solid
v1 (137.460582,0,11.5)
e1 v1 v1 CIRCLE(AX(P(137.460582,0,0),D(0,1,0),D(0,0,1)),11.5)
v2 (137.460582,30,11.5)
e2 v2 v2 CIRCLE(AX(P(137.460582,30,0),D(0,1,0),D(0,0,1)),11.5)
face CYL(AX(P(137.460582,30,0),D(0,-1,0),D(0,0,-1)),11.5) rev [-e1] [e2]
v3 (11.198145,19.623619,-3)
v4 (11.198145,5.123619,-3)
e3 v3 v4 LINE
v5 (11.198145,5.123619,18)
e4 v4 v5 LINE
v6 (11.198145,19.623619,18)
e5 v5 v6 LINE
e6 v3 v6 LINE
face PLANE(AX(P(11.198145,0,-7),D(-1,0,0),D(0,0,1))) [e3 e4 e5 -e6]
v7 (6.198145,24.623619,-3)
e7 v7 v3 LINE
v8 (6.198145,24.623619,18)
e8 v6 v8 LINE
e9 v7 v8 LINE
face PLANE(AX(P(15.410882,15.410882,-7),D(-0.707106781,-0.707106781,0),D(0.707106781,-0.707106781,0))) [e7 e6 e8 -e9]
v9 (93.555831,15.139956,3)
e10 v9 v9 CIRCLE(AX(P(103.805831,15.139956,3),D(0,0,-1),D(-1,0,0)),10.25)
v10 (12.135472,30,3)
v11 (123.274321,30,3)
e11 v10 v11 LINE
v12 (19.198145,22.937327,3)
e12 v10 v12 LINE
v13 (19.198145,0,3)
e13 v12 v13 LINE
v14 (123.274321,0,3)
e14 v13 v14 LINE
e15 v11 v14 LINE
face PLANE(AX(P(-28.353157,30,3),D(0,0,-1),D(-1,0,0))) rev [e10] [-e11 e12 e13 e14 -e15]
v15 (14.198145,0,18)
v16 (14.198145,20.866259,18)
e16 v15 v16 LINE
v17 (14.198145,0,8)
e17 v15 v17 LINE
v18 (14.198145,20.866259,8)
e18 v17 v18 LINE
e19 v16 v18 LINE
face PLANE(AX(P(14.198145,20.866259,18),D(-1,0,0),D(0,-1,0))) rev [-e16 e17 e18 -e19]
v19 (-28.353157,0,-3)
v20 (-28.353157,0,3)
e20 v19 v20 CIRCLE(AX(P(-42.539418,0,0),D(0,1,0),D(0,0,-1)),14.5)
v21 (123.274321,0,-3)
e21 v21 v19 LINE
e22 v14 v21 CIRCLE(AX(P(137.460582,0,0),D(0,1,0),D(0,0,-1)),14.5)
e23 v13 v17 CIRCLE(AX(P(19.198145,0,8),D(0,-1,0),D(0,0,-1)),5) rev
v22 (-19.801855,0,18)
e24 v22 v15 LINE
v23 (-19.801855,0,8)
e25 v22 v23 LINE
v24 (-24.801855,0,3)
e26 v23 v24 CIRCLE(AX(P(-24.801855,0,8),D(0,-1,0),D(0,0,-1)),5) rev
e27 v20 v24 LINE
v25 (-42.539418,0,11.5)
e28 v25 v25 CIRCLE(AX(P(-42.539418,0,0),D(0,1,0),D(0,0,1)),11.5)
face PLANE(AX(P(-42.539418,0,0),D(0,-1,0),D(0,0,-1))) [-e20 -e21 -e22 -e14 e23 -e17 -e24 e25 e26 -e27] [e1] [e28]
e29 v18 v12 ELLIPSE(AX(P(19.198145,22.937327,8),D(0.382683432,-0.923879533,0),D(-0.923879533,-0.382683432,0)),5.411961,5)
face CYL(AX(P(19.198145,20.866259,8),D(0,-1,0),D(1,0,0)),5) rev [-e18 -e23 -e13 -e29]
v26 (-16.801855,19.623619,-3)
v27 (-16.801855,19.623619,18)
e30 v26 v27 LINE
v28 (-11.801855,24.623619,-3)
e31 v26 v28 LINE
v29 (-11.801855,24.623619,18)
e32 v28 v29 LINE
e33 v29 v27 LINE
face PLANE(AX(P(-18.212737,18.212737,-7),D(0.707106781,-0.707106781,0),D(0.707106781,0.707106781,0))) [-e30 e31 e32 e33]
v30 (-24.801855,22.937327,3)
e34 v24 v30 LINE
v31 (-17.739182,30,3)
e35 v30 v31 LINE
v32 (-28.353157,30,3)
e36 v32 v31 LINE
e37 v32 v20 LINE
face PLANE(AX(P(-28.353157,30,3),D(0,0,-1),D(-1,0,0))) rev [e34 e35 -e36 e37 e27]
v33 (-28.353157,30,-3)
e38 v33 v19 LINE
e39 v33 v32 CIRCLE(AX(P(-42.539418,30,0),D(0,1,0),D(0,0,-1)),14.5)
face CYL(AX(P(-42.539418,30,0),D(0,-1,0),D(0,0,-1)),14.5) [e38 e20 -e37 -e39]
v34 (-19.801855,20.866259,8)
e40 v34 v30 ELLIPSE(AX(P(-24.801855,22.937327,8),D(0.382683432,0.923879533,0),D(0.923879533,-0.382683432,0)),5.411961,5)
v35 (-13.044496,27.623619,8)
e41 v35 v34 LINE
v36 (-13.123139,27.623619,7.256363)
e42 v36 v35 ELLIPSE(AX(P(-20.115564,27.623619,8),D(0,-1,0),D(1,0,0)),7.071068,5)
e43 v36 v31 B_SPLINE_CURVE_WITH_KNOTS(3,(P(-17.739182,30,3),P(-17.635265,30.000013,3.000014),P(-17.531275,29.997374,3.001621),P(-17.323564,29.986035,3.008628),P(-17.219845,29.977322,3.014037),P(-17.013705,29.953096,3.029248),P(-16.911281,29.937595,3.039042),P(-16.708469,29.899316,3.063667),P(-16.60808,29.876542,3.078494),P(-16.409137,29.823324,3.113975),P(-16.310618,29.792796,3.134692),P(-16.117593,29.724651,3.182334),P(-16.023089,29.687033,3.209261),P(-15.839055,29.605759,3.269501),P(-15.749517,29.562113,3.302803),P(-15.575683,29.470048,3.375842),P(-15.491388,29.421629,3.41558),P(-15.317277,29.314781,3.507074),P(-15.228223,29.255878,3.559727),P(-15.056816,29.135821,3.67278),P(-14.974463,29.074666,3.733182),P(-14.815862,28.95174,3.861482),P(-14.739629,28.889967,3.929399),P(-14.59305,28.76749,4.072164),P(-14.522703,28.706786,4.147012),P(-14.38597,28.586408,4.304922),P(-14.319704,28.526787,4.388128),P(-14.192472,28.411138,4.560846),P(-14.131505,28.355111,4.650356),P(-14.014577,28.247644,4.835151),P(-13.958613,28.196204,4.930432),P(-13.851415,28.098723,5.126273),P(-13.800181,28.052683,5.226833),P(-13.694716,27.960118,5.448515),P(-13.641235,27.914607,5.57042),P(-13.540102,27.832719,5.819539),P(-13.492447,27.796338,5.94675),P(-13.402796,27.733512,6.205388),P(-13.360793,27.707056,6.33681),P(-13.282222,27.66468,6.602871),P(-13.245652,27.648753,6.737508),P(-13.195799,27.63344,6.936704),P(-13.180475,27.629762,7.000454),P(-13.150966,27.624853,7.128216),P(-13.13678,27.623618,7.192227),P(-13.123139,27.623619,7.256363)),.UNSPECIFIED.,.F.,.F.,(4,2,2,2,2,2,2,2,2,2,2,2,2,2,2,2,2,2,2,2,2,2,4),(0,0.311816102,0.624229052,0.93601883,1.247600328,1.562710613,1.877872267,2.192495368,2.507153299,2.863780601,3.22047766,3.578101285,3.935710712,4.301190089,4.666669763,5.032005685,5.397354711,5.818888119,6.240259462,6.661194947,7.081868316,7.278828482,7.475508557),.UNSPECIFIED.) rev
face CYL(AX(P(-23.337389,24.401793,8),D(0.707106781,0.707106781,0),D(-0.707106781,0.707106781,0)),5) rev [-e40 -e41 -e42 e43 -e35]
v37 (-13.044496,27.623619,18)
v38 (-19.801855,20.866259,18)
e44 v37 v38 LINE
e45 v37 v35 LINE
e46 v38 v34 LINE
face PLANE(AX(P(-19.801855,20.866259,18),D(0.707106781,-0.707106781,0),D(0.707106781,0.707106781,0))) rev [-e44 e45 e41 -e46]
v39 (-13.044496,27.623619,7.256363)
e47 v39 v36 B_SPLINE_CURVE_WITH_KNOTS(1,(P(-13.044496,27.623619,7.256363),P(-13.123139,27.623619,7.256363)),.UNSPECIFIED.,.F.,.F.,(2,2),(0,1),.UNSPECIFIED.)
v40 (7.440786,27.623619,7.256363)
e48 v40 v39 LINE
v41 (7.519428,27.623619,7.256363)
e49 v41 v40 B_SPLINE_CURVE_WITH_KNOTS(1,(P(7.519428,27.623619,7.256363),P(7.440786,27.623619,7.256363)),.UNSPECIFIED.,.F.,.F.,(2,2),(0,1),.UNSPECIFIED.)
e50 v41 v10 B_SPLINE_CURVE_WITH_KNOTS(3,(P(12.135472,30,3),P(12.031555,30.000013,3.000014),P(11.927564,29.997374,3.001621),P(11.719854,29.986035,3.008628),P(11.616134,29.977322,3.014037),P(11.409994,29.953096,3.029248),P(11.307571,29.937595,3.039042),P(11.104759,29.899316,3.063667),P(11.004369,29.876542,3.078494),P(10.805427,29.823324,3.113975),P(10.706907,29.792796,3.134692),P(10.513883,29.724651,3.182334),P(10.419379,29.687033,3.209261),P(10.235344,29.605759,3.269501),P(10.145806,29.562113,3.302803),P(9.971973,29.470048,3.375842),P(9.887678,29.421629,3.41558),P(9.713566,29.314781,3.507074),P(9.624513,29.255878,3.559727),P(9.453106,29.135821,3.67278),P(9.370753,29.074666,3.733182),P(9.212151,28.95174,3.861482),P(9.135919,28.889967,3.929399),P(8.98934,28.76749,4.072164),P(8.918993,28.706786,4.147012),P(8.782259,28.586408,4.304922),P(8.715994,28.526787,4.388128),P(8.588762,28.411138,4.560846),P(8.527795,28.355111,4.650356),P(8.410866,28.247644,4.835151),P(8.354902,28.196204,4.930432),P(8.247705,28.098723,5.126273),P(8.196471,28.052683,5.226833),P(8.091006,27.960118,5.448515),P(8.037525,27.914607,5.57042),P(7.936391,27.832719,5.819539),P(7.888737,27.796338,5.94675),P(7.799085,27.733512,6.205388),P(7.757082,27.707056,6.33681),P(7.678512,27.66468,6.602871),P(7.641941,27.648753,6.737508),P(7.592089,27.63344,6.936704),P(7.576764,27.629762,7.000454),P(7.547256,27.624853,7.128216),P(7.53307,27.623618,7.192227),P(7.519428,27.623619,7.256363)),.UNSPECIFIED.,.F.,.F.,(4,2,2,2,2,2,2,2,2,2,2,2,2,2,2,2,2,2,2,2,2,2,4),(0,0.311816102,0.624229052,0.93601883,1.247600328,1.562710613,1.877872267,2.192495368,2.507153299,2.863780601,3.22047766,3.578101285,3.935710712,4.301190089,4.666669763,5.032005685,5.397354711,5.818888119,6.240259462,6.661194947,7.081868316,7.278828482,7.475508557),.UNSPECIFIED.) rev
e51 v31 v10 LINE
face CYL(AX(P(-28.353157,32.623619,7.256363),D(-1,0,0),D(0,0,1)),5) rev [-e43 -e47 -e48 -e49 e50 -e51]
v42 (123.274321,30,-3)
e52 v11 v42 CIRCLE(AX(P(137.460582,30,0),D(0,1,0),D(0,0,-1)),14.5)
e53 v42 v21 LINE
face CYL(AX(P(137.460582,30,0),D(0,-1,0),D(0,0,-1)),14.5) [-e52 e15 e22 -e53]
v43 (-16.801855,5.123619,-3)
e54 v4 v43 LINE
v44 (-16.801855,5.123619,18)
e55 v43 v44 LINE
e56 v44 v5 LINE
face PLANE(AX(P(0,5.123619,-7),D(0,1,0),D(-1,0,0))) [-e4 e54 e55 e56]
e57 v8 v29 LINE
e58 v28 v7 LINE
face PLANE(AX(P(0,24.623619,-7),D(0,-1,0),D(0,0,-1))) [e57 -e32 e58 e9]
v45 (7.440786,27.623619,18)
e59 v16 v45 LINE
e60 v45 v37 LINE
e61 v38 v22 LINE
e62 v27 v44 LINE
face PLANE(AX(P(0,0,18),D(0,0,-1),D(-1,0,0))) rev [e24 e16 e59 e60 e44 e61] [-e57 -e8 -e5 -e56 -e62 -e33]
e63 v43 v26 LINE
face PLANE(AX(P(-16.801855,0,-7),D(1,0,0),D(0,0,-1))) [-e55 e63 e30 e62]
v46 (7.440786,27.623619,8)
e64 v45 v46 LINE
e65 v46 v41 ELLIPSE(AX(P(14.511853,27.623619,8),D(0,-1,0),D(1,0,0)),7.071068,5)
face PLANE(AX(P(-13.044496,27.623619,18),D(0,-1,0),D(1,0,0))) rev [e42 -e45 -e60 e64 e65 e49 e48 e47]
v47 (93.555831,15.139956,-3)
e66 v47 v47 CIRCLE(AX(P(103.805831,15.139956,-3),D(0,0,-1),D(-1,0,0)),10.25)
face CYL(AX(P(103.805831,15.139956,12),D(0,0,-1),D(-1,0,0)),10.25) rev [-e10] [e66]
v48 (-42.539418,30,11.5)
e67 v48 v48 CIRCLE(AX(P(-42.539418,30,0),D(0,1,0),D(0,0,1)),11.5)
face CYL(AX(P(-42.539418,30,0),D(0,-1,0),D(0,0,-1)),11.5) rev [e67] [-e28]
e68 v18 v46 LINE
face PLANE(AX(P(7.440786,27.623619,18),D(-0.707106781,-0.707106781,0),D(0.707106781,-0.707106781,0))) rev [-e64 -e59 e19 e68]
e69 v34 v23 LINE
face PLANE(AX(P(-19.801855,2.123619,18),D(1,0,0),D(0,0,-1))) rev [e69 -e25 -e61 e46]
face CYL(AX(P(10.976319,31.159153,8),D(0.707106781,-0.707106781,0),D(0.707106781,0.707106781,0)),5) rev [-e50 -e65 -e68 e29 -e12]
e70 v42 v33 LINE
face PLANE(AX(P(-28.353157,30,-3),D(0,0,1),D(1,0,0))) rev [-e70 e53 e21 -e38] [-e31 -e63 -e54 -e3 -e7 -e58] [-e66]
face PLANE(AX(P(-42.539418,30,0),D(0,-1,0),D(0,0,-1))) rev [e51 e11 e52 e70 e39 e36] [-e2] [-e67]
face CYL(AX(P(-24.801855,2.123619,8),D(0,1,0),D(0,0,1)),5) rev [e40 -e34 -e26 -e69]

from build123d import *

# Parameters (mm, degrees)
SKETCH1_R           = 11.5
BOSS_EXTRUDE1_DEPTH = 30
CUT_EXTRUDE1_DEPTH  = 10
BOSS_EXTRUDE2_DEPTH = 15
SKETCH4_W           = 34
SKETCH4_H           = 2.123618691
BOSS_EXTRUDE3_DEPTH = 15
FILLET1_R           = 5
SKETCH5_R           = 10.25
CUT_EXTRUDE2_DEPTH  = 15


with BuildPart() as part:
    # Sketch1 → Boss-Extrude1 (new body)
    with BuildSketch(Plane(origin=(0, 0, 0), x_dir=(1, 0, 0), z_dir=(0, 1, 0))):
        with BuildLine():
            Line((-28.353157483, 3), (123.274320599, 3))
            ThreePointArc((123.274320599, 3), (151.960581558, 0), (123.274320599, -3))
            Line((123.274320599, -3), (-28.353157483, -3))
            ThreePointArc((-28.353157483, -3), (-57.039418442, 0), (-28.353157483, 3))
        make_face()
        with Locations(Location((-42.539418442, 0, 0), (0, 0, 270))):
            Circle(SKETCH1_R, mode=Mode.SUBTRACT)
        with Locations(Location((137.460581558, 0, 0), (0, 0, 270))):
            Circle(SKETCH1_R, mode=Mode.SUBTRACT)
    extrude(amount=BOSS_EXTRUDE1_DEPTH)

    # Sketch2 → Cut-Extrude1 (cut)
    with BuildSketch(Plane.XY.offset(3)):
        Polygon((6.198144817, 24.623618691), (-11.801855183, 24.623618691), (-16.801855183, 19.623618691), (-16.801855183, 5.123618691), (11.198144817, 5.123618691), (11.198144817, 19.623618691), align=None)
    extrude(amount=-CUT_EXTRUDE1_DEPTH, mode=Mode.SUBTRACT)

    # Sketch3 → Boss-Extrude2 (add)
    with BuildSketch(Plane.XY.offset(3)):
        Polygon((-13.044495871, 27.623618691), (7.440785504, 27.623618691), (14.198144817, 20.866259379), (14.198144817, 2.123618691), (-19.801855183, 2.123618691), (-19.801855183, 20.866259379), align=None)
        Polygon((-11.801855183, 24.623618691), (-16.801855183, 19.623618691), (-16.801855183, 5.123618691), (11.198144817, 5.123618691), (11.198144817, 19.623618691), (6.198144817, 24.623618691), align=None, mode=Mode.SUBTRACT)
    extrude(amount=BOSS_EXTRUDE2_DEPTH)

    # Sketch4 → Boss-Extrude3 (add)
    with BuildSketch(Plane.XY.offset(3)):
        with Locations((-2.801855183, 1.061809346)):
            Rectangle(SKETCH4_W, SKETCH4_H)
    extrude(amount=BOSS_EXTRUDE3_DEPTH)

    # Fillet1
    # the kernel refuses this fillet: 5 mm, written as the material it adds along each edge
    with BuildSketch(Plane(origin=(-28.640689948, 12.027424614, 3), x_dir=(-0.7071067811865481, 0.7071067811865469, 0), z_dir=(0.707106781186547, 0.7071067811865481, 0))) as fillet1_piece_1_section:
        with BuildLine():
            CenterArc((FILLET1_R, FILLET1_R), FILLET1_R, 180, 90)
            Line((0, FILLET1_R), (0, 0))
            Line((0, 0), (FILLET1_R, 0))
        make_face()
    fillet1_piece_1 = extrude(amount=34.556349186, mode=Mode.PRIVATE)
    fillet1_piece_1 = split(fillet1_piece_1, bisect_by=Plane(origin=(-28.640689948, 27.623618691, 3), z_dir=(0, -1, 0)), keep=Keep.TOP, mode=Mode.PRIVATE)
    fillet1_piece_1 = split(fillet1_piece_1, bisect_by=Plane(origin=(-19.801855183, 12.027424614, 3), z_dir=(1, 0, 0)), keep=Keep.TOP, mode=Mode.PRIVATE)
    add(fillet1_piece_1)
    with BuildSketch(Plane(origin=(-28.640689948, 12.027424614, 3), x_dir=(-0.7071067811865481, 0.7071067811865469, 0), z_dir=(0.707106781186547, 0.7071067811865481, 0))) as fillet1_piece_2_section:
        with BuildLine():
            CenterArc((FILLET1_R, FILLET1_R), FILLET1_R, 180, 90)
            Line((0, FILLET1_R), (0, 0))
            Line((0, 0), (FILLET1_R, 0))
        make_face()
    fillet1_piece_2 = extrude(amount=34.556349186, mode=Mode.PRIVATE)
    fillet1_piece_2 = split(fillet1_piece_2, bisect_by=Plane(origin=(-28.640689948, 27.623618691, 3), z_dir=(0, 1, 0)), keep=Keep.TOP, mode=Mode.PRIVATE)
    fillet1_piece_2 = split(fillet1_piece_2, bisect_by=Plane(origin=(-19.801855183, 12.027424614, 3), z_dir=(-1, 0, 0)), keep=Keep.TOP, mode=Mode.PRIVATE)
    add(fillet1_piece_2)
    with BuildSketch(Plane(origin=(-19.801855183, 0, 3), x_dir=(-1, 0, 0), z_dir=(0, 1, 0))) as fillet1_piece_3_section:
        with BuildLine():
            CenterArc((FILLET1_R, FILLET1_R), FILLET1_R, 180, 90)
            Line((0, FILLET1_R), (0, 0))
            Line((0, 0), (FILLET1_R, 0))
        make_face()
    fillet1_piece_3 = extrude(amount=33.366259379, mode=Mode.PRIVATE)
    fillet1_piece_3 = split(fillet1_piece_3, bisect_by=Plane(origin=(-30.234984873, 10.433129689, 3), z_dir=(0.7071067811865481, -0.707106781186547, 0)), keep=Keep.TOP, mode=Mode.PRIVATE)
    add(fillet1_piece_3)
    with BuildSketch(Plane(origin=(14.198144817, 33.366259379, 3), x_dir=(1, 0, 0), z_dir=(0, -1, 0))) as fillet1_piece_4_section:
        with BuildLine():
            CenterArc((FILLET1_R, FILLET1_R), FILLET1_R, 180, 90)
            Line((0, FILLET1_R), (0, 0))
            Line((0, 0), (FILLET1_R, 0))
        make_face()
    fillet1_piece_4 = extrude(amount=33.366259379, mode=Mode.PRIVATE)
    fillet1_piece_4 = split(fillet1_piece_4, bisect_by=Plane(origin=(7.948144817, 27.116259379, 3), z_dir=(-0.7071067811865476, -0.7071067811865476, 0)), keep=Keep.TOP, mode=Mode.PRIVATE)
    add(fillet1_piece_4)
    with BuildSketch(Plane(origin=(-1.398049261, 36.462453456, 3), x_dir=(0.7071067811865475, 0.7071067811865475, 0), z_dir=(0.7071067811865476, -0.7071067811865476, 0))) as fillet1_piece_5_section:
        with BuildLine():
            CenterArc((FILLET1_R, FILLET1_R), FILLET1_R, 180, 90)
            Line((0, FILLET1_R), (0, 0))
            Line((0, 0), (FILLET1_R, 0))
        make_face()
    fillet1_piece_5 = extrude(amount=34.556349186, mode=Mode.PRIVATE)
    fillet1_piece_5 = split(fillet1_piece_5, bisect_by=Plane(origin=(14.198144817, 36.462453456, 3), z_dir=(-1, 0, 0)), keep=Keep.TOP, mode=Mode.PRIVATE)
    fillet1_piece_5 = split(fillet1_piece_5, bisect_by=Plane(origin=(-1.398049261, 27.623618691, 3), z_dir=(0, -1, 0)), keep=Keep.TOP, mode=Mode.PRIVATE)
    add(fillet1_piece_5)
    with BuildSketch(Plane(origin=(-1.398049261, 36.462453456, 3), x_dir=(0.7071067811865475, 0.7071067811865475, 0), z_dir=(0.7071067811865476, -0.7071067811865476, 0))) as fillet1_piece_6_section:
        with BuildLine():
            CenterArc((FILLET1_R, FILLET1_R), FILLET1_R, 180, 90)
            Line((0, FILLET1_R), (0, 0))
            Line((0, 0), (FILLET1_R, 0))
        make_face()
    fillet1_piece_6 = extrude(amount=34.556349186, mode=Mode.PRIVATE)
    fillet1_piece_6 = split(fillet1_piece_6, bisect_by=Plane(origin=(14.198144817, 36.462453456, 3), z_dir=(1, 0, 0)), keep=Keep.TOP, mode=Mode.PRIVATE)
    fillet1_piece_6 = split(fillet1_piece_6, bisect_by=Plane(origin=(-1.398049261, 27.623618691, 3), z_dir=(0, 1, 0)), keep=Keep.TOP, mode=Mode.PRIVATE)
    add(fillet1_piece_6)
    with BuildSketch(Plane(origin=(-23.685403069, 27.623618691, 3), x_dir=(0, 1, 0), z_dir=(1, 0, 0))) as fillet1_piece_7_section:
        with BuildLine():
            CenterArc((5, 4.256362879), FILLET1_R, 180, 58.350352686)
            Line((0, 4.256362879), (0, 0))
            Line((0, 0), (2.376381309, 0))
        make_face()
    fillet1_piece_7 = extrude(amount=41.767095772, mode=Mode.PRIVATE)
    fillet1_piece_7 = split(fillet1_piece_7, bisect_by=Plane(origin=(-8.122308783, 43.186712978, 3), z_dir=(-0.7071067811865476, -0.7071067811865476, 0)), keep=Keep.TOP, mode=Mode.PRIVATE)
    fillet1_piece_7 = split(fillet1_piece_7, bisect_by=Plane(origin=(-18.36494947, 22.303165092, 3), z_dir=(0.7071067811865481, -0.707106781186547, 0)), keep=Keep.TOP, mode=Mode.PRIVATE)
    add(fillet1_piece_7)
    with BuildSketch(Plane(origin=(-19.801855183, 0, 3), x_dir=(-1, 0, 0), z_dir=(0, 1, 0))) as fillet1_piece_8a_section:
        with BuildLine():
            CenterArc((FILLET1_R, FILLET1_R), FILLET1_R, 180, 90)
            Line((0, FILLET1_R), (0, 0))
            Line((0, 0), (FILLET1_R, 0))
        make_face()
    fillet1_piece_8a = extrude(amount=33.366259379, mode=Mode.PRIVATE)
    fillet1_piece_8a = split(fillet1_piece_8a, bisect_by=Plane(origin=(-30.234984873, 10.433129689, 3), z_dir=(-0.7071067811865481, 0.707106781186547, 0)), keep=Keep.TOP, mode=Mode.PRIVATE)
    fillet1_piece_8a = split(fillet1_piece_8a, bisect_by=Plane(origin=(-19.801855183, 30, 3), z_dir=(0, -1, 0)), keep=Keep.TOP, mode=Mode.PRIVATE)
    with BuildSketch(Plane(origin=(-28.640689948, 12.027424614, 3), x_dir=(-0.7071067811865481, 0.7071067811865469, 0), z_dir=(0.707106781186547, 0.7071067811865481, 0))) as fillet1_piece_8b_section:
        with BuildLine():
            CenterArc((FILLET1_R, FILLET1_R), FILLET1_R, 180, 90)
            Line((0, FILLET1_R), (0, 0))
            Line((0, 0), (FILLET1_R, 0))
        make_face()
    fillet1_piece_8b = extrude(amount=34.556349186, mode=Mode.PRIVATE)
    fillet1_piece_8b = split(fillet1_piece_8b, bisect_by=Plane(origin=(-19.801855183, 12.027424614, 3), z_dir=(-1, 0, 0)), keep=Keep.TOP, mode=Mode.PRIVATE)
    fillet1_piece_8b = fillet1_piece_8b - Plane(origin=(-42.539418442, 12.027424614, 0), x_dir=(0.9783628247662832, 0, 0.20689655172413826), z_dir=(0, -1, 0)) * Cylinder(14.5, 90, mode=Mode.PRIVATE)
    fillet1_piece_8 = fillet1_piece_8a & fillet1_piece_8b
    add(fillet1_piece_8)
    with BuildSketch(Plane(origin=(-28.640689948, 12.027424614, 3), x_dir=(-0.7071067811865481, 0.7071067811865469, 0), z_dir=(0.707106781186547, 0.7071067811865481, 0))) as fillet1_piece_9a_section:
        with BuildLine():
            CenterArc((FILLET1_R, FILLET1_R), FILLET1_R, 180, 90)
            Line((0, FILLET1_R), (0, 0))
            Line((0, 0), (FILLET1_R, 0))
        make_face()
    fillet1_piece_9a = extrude(amount=34.556349186, mode=Mode.PRIVATE)
    fillet1_piece_9a = split(fillet1_piece_9a, bisect_by=Plane(origin=(-28.640689948, 27.623618691, 3), z_dir=(0, 1, 0)), keep=Keep.TOP, mode=Mode.PRIVATE)
    fillet1_piece_9a = split(fillet1_piece_9a, bisect_by=Plane(origin=(-28.640689948, 30, 3), z_dir=(0, -1, 0)), keep=Keep.TOP, mode=Mode.PRIVATE)
    with BuildSketch(Plane(origin=(-23.685403069, 27.623618691, 3), x_dir=(0, 1, 0), z_dir=(1, 0, 0))) as fillet1_piece_9b_section:
        with BuildLine():
            CenterArc((5, 4.256362879), FILLET1_R, 180, 58.350352686)
            Line((0, 4.256362879), (0, 0))
            Line((0, 0), (2.376381309, 0))
        make_face()
    fillet1_piece_9b = extrude(amount=41.767095772, mode=Mode.PRIVATE)
    fillet1_piece_9b = split(fillet1_piece_9b, bisect_by=Plane(origin=(-18.36494947, 22.303165092, 3), z_dir=(-0.7071067811865481, 0.707106781186547, 0)), keep=Keep.TOP, mode=Mode.PRIVATE)
    fillet1_piece_9 = fillet1_piece_9a & fillet1_piece_9b
    add(fillet1_piece_9)
    with BuildSketch(Plane(origin=(-1.398049261, 36.462453456, 3), x_dir=(0.7071067811865475, 0.7071067811865475, 0), z_dir=(0.7071067811865476, -0.7071067811865476, 0))) as fillet1_piece_10a_section:
        with BuildLine():
            CenterArc((FILLET1_R, FILLET1_R), FILLET1_R, 180, 90)
            Line((0, FILLET1_R), (0, 0))
            Line((0, 0), (FILLET1_R, 0))
        make_face()
    fillet1_piece_10a = extrude(amount=34.556349186, mode=Mode.PRIVATE)
    fillet1_piece_10a = split(fillet1_piece_10a, bisect_by=Plane(origin=(14.198144817, 36.462453456, 3), z_dir=(1, 0, 0)), keep=Keep.TOP, mode=Mode.PRIVATE)
    with BuildSketch(Plane(origin=(14.198144817, 33.366259379, 3), x_dir=(1, 0, 0), z_dir=(0, -1, 0))) as fillet1_piece_10b_section:
        with BuildLine():
            CenterArc((FILLET1_R, FILLET1_R), FILLET1_R, 180, 90)
            Line((0, FILLET1_R), (0, 0))
            Line((0, 0), (FILLET1_R, 0))
        make_face()
    fillet1_piece_10b = extrude(amount=33.366259379, mode=Mode.PRIVATE)
    fillet1_piece_10b = split(fillet1_piece_10b, bisect_by=Plane(origin=(7.948144817, 27.116259379, 3), z_dir=(0.7071067811865476, 0.7071067811865476, 0)), keep=Keep.TOP, mode=Mode.PRIVATE)
    fillet1_piece_10b = split(fillet1_piece_10b, bisect_by=Plane(origin=(14.198144817, 30, 3), z_dir=(0, -1, 0)), keep=Keep.TOP, mode=Mode.PRIVATE)
    fillet1_piece_10 = fillet1_piece_10a & fillet1_piece_10b
    add(fillet1_piece_10)
    with BuildSketch(Plane(origin=(-23.685403069, 27.623618691, 3), x_dir=(0, 1, 0), z_dir=(1, 0, 0))) as fillet1_piece_11a_section:
        with BuildLine():
            CenterArc((5, 4.256362879), FILLET1_R, 180, 58.350352686)
            Line((0, 4.256362879), (0, 0))
            Line((0, 0), (2.376381309, 0))
        make_face()
    fillet1_piece_11a = extrude(amount=41.767095772, mode=Mode.PRIVATE)
    fillet1_piece_11a = split(fillet1_piece_11a, bisect_by=Plane(origin=(-8.122308783, 43.186712978, 3), z_dir=(0.7071067811865476, 0.7071067811865476, 0)), keep=Keep.TOP, mode=Mode.PRIVATE)
    with BuildSketch(Plane(origin=(-1.398049261, 36.462453456, 3), x_dir=(0.7071067811865475, 0.7071067811865475, 0), z_dir=(0.7071067811865476, -0.7071067811865476, 0))) as fillet1_piece_11b_section:
        with BuildLine():
            CenterArc((FILLET1_R, FILLET1_R), FILLET1_R, 180, 90)
            Line((0, FILLET1_R), (0, 0))
            Line((0, 0), (FILLET1_R, 0))
        make_face()
    fillet1_piece_11b = extrude(amount=34.556349186, mode=Mode.PRIVATE)
    fillet1_piece_11b = split(fillet1_piece_11b, bisect_by=Plane(origin=(-1.398049261, 27.623618691, 3), z_dir=(0, 1, 0)), keep=Keep.TOP, mode=Mode.PRIVATE)
    fillet1_piece_11b = split(fillet1_piece_11b, bisect_by=Plane(origin=(-1.398049261, 30, 3), z_dir=(0, -1, 0)), keep=Keep.TOP, mode=Mode.PRIVATE)
    fillet1_piece_11 = fillet1_piece_11a & fillet1_piece_11b
    add(fillet1_piece_11)

    # Sketch5 → Cut-Extrude2 (cut)
    with BuildSketch(Plane(origin=(0, 0, -3), x_dir=(-1, 0, 0), z_dir=(0, 0, -1))):
        with Locations((-103.805830626, 15.139955724)):
            Circle(SKETCH5_R)
    extrude(amount=-CUT_EXTRUDE2_DEPTH, mode=Mode.SUBTRACT)


solid = part.part
